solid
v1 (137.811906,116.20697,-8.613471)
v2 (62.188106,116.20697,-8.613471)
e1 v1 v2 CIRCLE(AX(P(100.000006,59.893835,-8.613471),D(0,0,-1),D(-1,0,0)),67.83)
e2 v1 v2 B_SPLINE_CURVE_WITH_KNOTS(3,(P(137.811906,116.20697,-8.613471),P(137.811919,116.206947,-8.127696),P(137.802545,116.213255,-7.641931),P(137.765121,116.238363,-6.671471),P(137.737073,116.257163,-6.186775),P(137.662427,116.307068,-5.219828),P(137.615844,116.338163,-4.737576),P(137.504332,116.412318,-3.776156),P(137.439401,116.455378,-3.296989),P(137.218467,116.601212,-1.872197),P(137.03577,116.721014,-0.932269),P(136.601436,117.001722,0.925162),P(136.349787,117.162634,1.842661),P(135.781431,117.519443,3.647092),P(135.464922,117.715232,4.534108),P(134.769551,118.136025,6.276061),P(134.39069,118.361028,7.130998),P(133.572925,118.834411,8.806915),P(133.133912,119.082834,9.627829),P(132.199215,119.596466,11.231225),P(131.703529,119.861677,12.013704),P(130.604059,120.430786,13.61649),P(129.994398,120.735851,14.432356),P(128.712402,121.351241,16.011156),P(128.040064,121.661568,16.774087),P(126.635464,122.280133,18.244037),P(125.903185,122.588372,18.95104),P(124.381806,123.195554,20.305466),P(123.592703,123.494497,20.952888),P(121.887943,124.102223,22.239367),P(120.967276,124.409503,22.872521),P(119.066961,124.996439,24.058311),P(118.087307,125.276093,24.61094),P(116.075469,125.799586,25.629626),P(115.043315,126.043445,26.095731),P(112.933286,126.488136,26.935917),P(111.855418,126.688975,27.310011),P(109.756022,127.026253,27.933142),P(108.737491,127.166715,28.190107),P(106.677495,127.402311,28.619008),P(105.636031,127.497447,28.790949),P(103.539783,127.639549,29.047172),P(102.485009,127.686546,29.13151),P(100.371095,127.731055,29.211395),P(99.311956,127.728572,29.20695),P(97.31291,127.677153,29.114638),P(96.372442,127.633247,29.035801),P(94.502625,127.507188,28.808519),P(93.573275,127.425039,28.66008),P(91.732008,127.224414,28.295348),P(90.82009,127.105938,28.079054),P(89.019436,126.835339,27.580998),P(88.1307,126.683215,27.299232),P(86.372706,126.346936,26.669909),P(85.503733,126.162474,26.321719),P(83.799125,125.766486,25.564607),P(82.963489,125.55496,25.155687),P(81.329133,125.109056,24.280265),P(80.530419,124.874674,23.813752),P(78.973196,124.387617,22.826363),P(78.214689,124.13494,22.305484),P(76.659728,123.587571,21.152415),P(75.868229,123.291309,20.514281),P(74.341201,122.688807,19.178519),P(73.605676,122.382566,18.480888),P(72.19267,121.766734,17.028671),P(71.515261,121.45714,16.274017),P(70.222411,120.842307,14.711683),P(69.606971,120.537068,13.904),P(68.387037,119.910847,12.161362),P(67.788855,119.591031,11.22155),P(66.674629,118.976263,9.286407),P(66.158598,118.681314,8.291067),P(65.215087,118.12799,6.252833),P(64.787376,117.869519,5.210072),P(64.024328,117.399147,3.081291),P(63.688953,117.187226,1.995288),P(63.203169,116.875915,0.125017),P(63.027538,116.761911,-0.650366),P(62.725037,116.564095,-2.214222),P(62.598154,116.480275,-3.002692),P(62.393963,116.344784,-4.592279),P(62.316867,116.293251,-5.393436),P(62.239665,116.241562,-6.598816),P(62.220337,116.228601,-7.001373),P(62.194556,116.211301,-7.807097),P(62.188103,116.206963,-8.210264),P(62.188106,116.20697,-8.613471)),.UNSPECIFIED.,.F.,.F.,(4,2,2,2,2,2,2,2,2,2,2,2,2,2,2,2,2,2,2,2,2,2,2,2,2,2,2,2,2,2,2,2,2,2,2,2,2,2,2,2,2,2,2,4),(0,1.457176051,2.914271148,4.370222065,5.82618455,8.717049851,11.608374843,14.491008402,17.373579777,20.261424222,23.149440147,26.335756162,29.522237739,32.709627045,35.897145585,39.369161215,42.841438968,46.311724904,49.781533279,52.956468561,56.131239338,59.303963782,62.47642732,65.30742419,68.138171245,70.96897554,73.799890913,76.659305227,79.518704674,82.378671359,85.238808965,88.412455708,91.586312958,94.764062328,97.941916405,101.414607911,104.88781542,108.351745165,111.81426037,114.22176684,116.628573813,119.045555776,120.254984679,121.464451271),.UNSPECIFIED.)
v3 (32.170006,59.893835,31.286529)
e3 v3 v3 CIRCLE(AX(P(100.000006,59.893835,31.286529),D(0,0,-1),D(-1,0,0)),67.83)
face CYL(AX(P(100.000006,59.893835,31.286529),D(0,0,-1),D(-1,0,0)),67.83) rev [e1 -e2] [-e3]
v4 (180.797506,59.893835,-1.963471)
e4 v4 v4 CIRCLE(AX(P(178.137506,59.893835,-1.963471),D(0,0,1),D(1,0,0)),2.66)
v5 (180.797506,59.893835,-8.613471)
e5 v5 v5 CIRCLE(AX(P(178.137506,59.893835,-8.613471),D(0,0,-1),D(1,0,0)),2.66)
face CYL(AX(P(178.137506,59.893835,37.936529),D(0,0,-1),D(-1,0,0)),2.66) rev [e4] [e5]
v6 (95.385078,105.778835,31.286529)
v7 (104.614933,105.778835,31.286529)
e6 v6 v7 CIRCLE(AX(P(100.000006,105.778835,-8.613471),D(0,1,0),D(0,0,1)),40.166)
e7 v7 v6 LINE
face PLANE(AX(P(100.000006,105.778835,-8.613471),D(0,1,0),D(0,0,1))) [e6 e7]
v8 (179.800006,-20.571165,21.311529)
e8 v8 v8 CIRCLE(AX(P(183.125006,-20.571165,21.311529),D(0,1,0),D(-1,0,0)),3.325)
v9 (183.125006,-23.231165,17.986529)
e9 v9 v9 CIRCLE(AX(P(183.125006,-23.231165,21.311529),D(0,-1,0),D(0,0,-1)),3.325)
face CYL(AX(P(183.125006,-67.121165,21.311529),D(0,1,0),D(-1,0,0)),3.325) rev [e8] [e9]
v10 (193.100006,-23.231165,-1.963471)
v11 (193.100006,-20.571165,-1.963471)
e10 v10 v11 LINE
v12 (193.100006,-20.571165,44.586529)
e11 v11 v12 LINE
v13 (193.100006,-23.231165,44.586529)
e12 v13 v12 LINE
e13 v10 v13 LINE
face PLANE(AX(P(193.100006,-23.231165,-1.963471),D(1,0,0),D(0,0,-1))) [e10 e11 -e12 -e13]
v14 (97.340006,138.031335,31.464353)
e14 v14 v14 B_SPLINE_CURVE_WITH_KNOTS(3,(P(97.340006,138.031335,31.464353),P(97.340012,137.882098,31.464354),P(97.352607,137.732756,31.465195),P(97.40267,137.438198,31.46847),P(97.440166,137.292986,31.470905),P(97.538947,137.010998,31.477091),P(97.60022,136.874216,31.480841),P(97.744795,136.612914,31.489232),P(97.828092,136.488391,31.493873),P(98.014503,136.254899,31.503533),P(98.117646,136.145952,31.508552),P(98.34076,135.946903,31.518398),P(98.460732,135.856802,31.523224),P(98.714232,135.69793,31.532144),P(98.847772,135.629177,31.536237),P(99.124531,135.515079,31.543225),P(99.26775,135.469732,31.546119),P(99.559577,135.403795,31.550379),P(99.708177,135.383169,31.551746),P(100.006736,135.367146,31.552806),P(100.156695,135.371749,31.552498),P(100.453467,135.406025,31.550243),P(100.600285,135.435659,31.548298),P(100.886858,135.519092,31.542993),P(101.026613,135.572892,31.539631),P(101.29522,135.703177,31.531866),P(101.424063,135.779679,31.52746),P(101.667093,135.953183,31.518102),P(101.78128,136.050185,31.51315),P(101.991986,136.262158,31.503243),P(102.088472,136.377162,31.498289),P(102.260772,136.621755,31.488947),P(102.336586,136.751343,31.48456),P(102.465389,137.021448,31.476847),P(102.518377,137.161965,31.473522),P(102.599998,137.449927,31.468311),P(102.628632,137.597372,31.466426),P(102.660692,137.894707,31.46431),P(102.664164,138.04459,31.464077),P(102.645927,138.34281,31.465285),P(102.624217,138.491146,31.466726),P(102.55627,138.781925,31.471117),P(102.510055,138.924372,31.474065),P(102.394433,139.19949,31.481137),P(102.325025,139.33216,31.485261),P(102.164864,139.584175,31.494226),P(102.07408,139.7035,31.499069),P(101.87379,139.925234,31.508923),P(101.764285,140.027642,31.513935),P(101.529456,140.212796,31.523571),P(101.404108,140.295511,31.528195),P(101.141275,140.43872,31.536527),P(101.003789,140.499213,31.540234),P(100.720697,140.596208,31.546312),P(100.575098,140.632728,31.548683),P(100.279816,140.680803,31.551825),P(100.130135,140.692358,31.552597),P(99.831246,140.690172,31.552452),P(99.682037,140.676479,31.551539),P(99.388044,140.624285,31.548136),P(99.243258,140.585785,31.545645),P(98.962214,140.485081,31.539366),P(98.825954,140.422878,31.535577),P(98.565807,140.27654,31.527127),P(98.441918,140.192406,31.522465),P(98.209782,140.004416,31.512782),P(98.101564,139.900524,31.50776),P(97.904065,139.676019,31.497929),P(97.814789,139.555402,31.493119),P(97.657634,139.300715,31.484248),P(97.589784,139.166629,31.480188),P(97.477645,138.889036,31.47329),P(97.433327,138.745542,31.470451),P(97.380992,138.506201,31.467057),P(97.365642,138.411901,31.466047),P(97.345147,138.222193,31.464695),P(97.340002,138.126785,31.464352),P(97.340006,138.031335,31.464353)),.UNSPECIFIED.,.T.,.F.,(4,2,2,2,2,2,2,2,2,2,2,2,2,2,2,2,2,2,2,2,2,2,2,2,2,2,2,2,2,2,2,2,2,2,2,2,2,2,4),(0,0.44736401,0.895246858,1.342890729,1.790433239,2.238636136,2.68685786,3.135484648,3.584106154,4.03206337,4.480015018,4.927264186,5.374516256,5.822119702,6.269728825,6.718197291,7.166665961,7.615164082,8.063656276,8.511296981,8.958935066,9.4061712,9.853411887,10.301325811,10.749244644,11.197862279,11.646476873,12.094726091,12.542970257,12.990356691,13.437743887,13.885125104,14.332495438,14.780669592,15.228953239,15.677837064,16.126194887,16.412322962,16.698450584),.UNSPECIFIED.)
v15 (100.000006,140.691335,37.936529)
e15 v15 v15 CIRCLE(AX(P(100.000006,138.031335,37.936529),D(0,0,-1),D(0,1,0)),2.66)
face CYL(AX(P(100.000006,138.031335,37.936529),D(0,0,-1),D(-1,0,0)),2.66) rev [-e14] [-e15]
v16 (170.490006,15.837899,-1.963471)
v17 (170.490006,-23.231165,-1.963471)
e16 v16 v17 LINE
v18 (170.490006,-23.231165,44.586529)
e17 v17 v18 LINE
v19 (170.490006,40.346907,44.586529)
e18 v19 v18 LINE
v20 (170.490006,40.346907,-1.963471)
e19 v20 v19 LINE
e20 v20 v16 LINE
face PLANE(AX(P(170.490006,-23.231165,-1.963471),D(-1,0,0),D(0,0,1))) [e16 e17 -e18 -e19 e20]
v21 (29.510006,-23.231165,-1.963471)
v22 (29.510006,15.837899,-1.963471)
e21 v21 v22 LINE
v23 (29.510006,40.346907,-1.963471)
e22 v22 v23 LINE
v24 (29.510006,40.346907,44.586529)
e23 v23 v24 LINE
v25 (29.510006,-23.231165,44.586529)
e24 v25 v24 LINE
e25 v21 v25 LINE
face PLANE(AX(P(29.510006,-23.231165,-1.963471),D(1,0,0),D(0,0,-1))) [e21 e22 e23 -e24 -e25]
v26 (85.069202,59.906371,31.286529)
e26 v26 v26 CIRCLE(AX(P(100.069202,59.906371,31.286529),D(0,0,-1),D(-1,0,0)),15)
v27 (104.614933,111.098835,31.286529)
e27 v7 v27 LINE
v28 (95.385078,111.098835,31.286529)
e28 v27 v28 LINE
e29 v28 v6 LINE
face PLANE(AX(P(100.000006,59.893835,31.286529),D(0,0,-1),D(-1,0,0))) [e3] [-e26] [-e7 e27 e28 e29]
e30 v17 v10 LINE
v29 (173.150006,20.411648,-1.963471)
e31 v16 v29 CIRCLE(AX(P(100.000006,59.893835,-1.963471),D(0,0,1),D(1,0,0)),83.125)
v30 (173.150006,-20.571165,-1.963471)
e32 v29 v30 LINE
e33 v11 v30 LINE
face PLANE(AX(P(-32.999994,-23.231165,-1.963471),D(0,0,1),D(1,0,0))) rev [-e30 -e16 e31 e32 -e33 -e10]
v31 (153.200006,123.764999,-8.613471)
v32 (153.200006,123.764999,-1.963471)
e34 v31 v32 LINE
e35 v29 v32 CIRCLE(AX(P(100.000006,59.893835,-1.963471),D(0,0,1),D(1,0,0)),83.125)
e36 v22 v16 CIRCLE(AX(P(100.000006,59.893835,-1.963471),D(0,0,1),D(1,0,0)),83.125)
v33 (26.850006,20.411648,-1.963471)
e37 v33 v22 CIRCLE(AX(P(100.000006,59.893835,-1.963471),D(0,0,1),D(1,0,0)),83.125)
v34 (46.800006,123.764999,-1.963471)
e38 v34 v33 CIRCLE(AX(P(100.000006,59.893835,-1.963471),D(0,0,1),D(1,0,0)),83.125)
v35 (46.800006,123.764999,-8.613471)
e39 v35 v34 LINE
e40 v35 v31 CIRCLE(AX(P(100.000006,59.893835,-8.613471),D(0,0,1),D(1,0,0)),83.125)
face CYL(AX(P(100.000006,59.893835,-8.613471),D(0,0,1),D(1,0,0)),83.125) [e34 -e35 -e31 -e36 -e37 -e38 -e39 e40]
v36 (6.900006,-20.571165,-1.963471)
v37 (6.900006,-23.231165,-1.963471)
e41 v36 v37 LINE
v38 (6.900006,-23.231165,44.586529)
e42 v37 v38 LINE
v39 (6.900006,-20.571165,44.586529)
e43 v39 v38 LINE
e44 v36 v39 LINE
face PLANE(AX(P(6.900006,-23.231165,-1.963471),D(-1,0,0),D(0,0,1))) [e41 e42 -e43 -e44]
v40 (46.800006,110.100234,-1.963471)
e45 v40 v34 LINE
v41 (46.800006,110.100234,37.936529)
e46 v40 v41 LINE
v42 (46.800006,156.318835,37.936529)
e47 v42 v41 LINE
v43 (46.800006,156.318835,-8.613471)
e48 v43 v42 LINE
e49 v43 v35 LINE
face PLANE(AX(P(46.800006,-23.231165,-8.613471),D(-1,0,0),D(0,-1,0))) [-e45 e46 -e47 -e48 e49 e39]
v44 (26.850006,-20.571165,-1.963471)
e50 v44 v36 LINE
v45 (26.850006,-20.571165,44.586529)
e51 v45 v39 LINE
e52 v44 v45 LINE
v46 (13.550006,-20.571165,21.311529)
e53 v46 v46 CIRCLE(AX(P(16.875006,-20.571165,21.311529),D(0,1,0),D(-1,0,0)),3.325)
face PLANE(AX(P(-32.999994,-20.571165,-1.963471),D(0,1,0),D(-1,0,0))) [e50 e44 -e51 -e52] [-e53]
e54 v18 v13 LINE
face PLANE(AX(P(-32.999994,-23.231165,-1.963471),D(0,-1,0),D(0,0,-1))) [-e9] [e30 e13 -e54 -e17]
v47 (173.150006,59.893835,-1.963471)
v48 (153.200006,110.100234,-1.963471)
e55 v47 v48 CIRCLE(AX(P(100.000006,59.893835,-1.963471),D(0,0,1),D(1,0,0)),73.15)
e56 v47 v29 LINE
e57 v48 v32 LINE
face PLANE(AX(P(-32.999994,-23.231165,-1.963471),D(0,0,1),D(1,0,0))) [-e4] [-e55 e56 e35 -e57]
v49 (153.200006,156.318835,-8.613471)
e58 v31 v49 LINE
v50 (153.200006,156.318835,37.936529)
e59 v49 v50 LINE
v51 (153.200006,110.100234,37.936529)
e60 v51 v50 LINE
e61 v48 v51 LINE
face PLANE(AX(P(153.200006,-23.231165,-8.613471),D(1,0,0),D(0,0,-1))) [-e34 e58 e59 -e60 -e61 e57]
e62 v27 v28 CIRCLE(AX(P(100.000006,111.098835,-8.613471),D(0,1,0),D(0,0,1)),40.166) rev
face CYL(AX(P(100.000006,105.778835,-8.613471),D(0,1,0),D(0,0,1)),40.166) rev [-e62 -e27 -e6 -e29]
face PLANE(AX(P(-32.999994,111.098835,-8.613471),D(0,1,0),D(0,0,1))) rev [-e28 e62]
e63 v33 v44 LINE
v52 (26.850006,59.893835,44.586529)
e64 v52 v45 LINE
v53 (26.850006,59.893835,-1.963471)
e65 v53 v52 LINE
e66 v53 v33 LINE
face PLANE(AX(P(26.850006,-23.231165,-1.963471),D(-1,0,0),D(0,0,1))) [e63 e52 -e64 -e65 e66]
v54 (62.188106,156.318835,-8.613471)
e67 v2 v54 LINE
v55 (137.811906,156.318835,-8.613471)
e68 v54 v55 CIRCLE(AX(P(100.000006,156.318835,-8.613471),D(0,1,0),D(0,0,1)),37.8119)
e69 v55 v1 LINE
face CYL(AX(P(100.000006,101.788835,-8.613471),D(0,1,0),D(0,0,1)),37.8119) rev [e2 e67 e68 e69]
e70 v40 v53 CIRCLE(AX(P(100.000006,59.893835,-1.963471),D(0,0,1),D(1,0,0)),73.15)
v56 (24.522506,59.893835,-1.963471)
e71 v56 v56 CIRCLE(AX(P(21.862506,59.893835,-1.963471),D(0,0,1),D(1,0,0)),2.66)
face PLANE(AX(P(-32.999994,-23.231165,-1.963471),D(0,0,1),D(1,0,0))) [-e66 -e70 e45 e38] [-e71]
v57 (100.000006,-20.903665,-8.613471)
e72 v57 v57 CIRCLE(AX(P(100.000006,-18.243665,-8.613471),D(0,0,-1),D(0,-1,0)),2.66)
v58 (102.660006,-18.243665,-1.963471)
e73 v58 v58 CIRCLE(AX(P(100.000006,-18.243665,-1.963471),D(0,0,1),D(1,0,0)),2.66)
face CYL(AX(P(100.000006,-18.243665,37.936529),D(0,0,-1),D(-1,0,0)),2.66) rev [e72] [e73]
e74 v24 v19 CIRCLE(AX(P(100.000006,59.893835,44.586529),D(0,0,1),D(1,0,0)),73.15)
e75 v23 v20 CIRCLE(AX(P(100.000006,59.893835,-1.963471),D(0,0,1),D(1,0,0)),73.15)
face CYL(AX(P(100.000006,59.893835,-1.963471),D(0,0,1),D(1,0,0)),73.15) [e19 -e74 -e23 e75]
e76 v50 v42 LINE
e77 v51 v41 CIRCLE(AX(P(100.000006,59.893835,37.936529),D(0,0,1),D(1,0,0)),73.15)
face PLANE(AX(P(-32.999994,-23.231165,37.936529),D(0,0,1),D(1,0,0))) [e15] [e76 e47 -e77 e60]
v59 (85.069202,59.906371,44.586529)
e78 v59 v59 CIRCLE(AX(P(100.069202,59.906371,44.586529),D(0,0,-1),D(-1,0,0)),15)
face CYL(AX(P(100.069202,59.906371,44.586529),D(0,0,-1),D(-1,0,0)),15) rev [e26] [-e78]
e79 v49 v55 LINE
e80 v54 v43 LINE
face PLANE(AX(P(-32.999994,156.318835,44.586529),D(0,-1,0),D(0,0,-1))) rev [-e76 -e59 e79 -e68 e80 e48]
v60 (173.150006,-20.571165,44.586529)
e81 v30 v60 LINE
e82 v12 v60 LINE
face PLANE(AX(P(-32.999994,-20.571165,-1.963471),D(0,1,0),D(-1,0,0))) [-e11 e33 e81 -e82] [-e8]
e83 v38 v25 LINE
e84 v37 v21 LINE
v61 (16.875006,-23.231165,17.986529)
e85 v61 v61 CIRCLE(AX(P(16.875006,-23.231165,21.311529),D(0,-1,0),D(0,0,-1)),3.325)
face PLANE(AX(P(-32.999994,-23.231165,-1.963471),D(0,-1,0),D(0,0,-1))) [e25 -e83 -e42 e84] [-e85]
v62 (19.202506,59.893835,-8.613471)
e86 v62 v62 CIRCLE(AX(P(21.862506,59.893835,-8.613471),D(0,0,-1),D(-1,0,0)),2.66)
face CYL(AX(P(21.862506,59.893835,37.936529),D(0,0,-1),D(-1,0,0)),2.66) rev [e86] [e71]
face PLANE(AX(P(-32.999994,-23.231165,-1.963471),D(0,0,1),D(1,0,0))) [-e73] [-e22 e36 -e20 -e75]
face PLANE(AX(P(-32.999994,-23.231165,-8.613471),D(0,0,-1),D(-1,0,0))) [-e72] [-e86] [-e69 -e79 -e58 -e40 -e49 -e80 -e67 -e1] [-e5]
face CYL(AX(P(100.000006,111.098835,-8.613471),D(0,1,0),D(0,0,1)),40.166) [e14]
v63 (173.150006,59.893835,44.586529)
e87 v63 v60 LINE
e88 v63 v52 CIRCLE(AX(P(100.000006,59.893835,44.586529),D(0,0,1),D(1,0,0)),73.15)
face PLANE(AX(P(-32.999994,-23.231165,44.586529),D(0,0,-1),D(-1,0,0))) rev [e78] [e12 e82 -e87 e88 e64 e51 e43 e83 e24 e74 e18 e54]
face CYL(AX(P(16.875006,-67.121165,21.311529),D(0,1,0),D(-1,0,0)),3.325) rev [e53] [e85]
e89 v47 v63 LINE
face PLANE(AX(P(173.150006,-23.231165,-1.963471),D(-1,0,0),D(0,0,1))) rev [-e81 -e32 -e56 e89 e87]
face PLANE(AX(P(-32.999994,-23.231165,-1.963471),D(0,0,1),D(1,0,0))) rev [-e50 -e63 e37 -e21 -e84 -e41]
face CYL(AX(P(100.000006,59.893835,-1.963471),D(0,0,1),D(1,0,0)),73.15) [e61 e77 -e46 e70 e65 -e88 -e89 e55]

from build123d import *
from OCP.BRepAlgoAPI import BRepAlgoAPI_Cut
from OCP.TopTools import TopTools_ListOfShape

# Parameters (mm, degrees)
SKETCH1_W           = 200
SKETCH1_H           = 135
BOSS_EXTRUDE1_DEPTH = 40
CUT_EXTRUDE2_DEPTH  = 40
CUT_EXTRUDE3_DEPTH  = 35
CUT_EXTRUDE4_DEPTH  = 5
SKETCH9_R           = 50
CUT_EXTRUDE5_DEPTH  = 28.2
BOSS_EXTRUDE2_DEPTH = 35
CUT_EXTRUDE6_DEPTH  = 35
SKETCH15_R          = 2
CUT_EXTRUDE8_DEPTH  = 35
CIRPATTERN1_COUNT   = 4
SKETCH16_R          = 2.5
CUT_EXTRUDE9_DEPTH  = 35
SKETCH17_R          = 30.2
CUT_EXTRUDE10_DEPTH = 38
BOSS_EXTRUDE3_DEPTH = 34
SKETCH19_R          = 28.43
CUT_EXTRUDE11_DEPTH = 41
SKETCH20_R          = 51
CUT_EXTRUDE12_DEPTH = 30
SCALE6_SCALE        = 1.33
SKETCH23_R          = 15
CUT_EXTRUDE15_DEPTH = 252.625115315


with BuildPart() as part:
    # Sketch1 → Boss-Extrude1 (new body)
    with BuildSketch(Plane.XY):
        with Locations((100, 67.5)):
            Rectangle(SKETCH1_W, SKETCH1_H)
    extrude(amount=BOSS_EXTRUDE1_DEPTH)

    # Sketch6 → Cut-Extrude2 (cut)
    with BuildSketch(Plane.XY.offset(40)):
        with BuildLine():
            Line((0, 0), (100, 0))
            ThreePointArc((100, 0), (41.230473516, 41.230473516), (60, 110.523431781))
            Line((60, 110.523431781), (60, 135))
            Line((60, 135), (0, 135))
            Line((0, 135), (0, 0))
        make_face()
        with BuildLine():
            ThreePointArc((140, 110.523431781), (158.769526484, 41.230473516), (100, 0))
            Line((100, 0), (200, 0))
            Line((200, 0), (200, 135))
            Line((200, 135), (140, 135))
            Line((140, 135), (140, 110.523431781))
        make_face()
    extrude(amount=-CUT_EXTRUDE2_DEPTH, mode=Mode.SUBTRACT)

    # Sketch7 → Cut-Extrude3 (cut)
    with BuildSketch(Plane.XY.offset(40)):
        with BuildLine():
            ThreePointArc((155, 62.5), (79.689903988, 11.387379249), (60, 100.249172176))
            Line((60, 100.249172176), (60, 110.523431781))
            ThreePointArc((60, 110.523431781), (100, 0), (140, 110.523431781))
            Line((140, 110.523431781), (140, 100.249172176))
            ThreePointArc((140, 100.249172176), (151.112620751, 82.810096012), (155, 62.5))
        make_face()
    extrude(amount=-CUT_EXTRUDE3_DEPTH, mode=Mode.SUBTRACT)

    # Sketch8 → Cut-Extrude4 (cut)
    with BuildSketch(Plane.XY.offset(40)):
        with BuildLine():
            Line((60, 135), (60, 100.249172176))
            ThreePointArc((60, 100.249172176), (100, 117.5), (140, 100.249172176))
            Line((140, 100.249172176), (140, 135))
            Line((140, 135), (60, 135))
        make_face()
    extrude(amount=-CUT_EXTRUDE4_DEPTH, mode=Mode.SUBTRACT)

    # Sketch9 → Cut-Extrude5 (cut)
    with BuildSketch(Plane(origin=(0, 0, 0), x_dir=(-1, 0, 0), z_dir=(0, 0, -1))):
        with Locations((-100, 62.5)):
            Circle(SKETCH9_R)
    extrude(amount=-CUT_EXTRUDE5_DEPTH, mode=Mode.SUBTRACT)

    # Sketch10 → Boss-Extrude2 (add)
    with BuildSketch(Plane.XY.offset(40)):
        with BuildLine():
            Line((155, 2), (155, 62.5))
            ThreePointArc((155, 62.5), (154.497706374, 55.083801513), (153, 47.803061543))
            Line((153, 47.803061543), (153, 0))
            Line((153, 0), (170, 0))
            Line((170, 0), (170, 2))
            Line((170, 2), (155, 2))
        make_face()
        with BuildLine():
            ThreePointArc((47, 47.803061543), (45.502293626, 55.083801513), (45, 62.5))
            Line((45, 62.5), (45, 2))
            Line((45, 2), (30, 2))
            Line((30, 2), (30, 0))
            Line((30, 0), (47, 0))
            Line((47, 0), (47, 47.803061543))
        make_face()
    extrude(amount=-BOSS_EXTRUDE2_DEPTH)

    # Sketch12 → Cut-Extrude6 (cut)
    with BuildSketch(Plane(origin=(0, 135, 0), x_dir=(1, 0, 0), z_dir=(0, 1, 0))):
        with BuildLine():
            ThreePointArc((71.8, 0), (100, -28.2), (128.2, 0))
            Line((128.2, 0), (71.8, 0))
        make_face()
    extrude(amount=-CUT_EXTRUDE6_DEPTH, mode=Mode.SUBTRACT)

    # Sketch15 → Cut-Extrude8 (cut)
    with BuildSketch(Plane(origin=(0, 0, 0), x_dir=(-1, 0, 0), z_dir=(0, 0, -1))):
        with Locations((-41.25, 62.5)):
            Circle(SKETCH15_R)
    cut_extrude8 = extrude(amount=-CUT_EXTRUDE8_DEPTH, mode=Mode.SUBTRACT)

    # CirPattern1: Cut-Extrude8 ×4 about axis
    cirpattern1_axis = Axis((100, 62.5, 5), (0, 0, 1))
    for i in range(1, CIRPATTERN1_COUNT):
        add(cut_extrude8.rotate(cirpattern1_axis, i * 360 / CIRPATTERN1_COUNT), mode=Mode.SUBTRACT)

    # Sketch16 → Cut-Extrude9 (cut)
    with BuildSketch(Plane(origin=(0, 2, 0), x_dir=(1, 0, 0), z_dir=(0, 1, 0))):
        with Locations((162.5, -22.5)):
            Circle(SKETCH16_R)
        with Locations((37.5, -22.5)):
            Circle(SKETCH16_R)
    extrude(amount=-CUT_EXTRUDE9_DEPTH, mode=Mode.SUBTRACT)

    # Sketch17 → Cut-Extrude10 (cut)
    with BuildSketch(Plane(origin=(0, 135, 0), x_dir=(1, 0, 0), z_dir=(0, 1, 0))):
        with Locations((100, 0)):
            Circle(SKETCH17_R)
    extrude(amount=-CUT_EXTRUDE10_DEPTH, mode=Mode.SUBTRACT)

    # Sketch18 → Boss-Extrude3 (add)
    with BuildSketch(Plane(origin=(0, 135, 0), x_dir=(1, 0, 0), z_dir=(0, 1, 0))):
        with BuildLine():
            Line((130.2, 0), (69.8, 0))
            ThreePointArc((69.8, 0), (100, -30.2), (130.2, 0))
        make_face()
    extrude(amount=-BOSS_EXTRUDE3_DEPTH)

    # Sketch19 → Cut-Extrude11 (cut)
    with BuildSketch(Plane(origin=(0, 135, 0), x_dir=(1, 0, 0), z_dir=(0, 1, 0))):
        with Locations((100, 0)):
            Circle(SKETCH19_R)
    extrude(amount=-CUT_EXTRUDE11_DEPTH, mode=Mode.SUBTRACT)

    # Sketch20 → Cut-Extrude12 (cut)
    with BuildSketch(Plane(origin=(0, 0, 0), x_dir=(-1, 0, 0), z_dir=(0, 0, -1))):
        with Locations((-100, 62.5)):
            Circle(SKETCH20_R)
    extrude(amount=-CUT_EXTRUDE12_DEPTH, mode=Mode.SUBTRACT)


with BuildPart() as part_1:
    # Scale6: scaled about (99.999974033, 70.397501302, 26.101442821)
    add(part.part.scale(SCALE6_SCALE).moved(Location((-32.999991431, -23.23117543, -8.613476131))))


with BuildPart() as cut_extrude15_tool:
    # Sketch23 → Cut-Extrude15 (new, through all)
    with BuildSketch(Plane(origin=(0, 0, 31.286528804), x_dir=(-1, 0, 0), z_dir=(0, 0, -1))):
        with Locations((-100.069201604, 59.906371454)):
            Circle(SKETCH23_R)
    extrude(amount=-CUT_EXTRUDE15_DEPTH)


with BuildPart() as part_2:
    add(part_1.part)

    # Cut-Extrude15: cut by cut_extrude15_tool, with a tolerance
    cut_extrude15_stock = TopTools_ListOfShape()
    cut_extrude15_stock.Append(part_2.part.wrapped)
    cut_extrude15_tools = TopTools_ListOfShape()
    cut_extrude15_tools.Append(cut_extrude15_tool.part.wrapped)
    cut_extrude15_cut = BRepAlgoAPI_Cut()
    cut_extrude15_cut.SetArguments(cut_extrude15_stock)
    cut_extrude15_cut.SetTools(cut_extrude15_tools)
    cut_extrude15_cut.SetFuzzyValue(0.00001)
    cut_extrude15_cut.Build()
    add(Compound.cast(cut_extrude15_cut.Shape()).solids(), mode=Mode.REPLACE)


solid = part_2.part
